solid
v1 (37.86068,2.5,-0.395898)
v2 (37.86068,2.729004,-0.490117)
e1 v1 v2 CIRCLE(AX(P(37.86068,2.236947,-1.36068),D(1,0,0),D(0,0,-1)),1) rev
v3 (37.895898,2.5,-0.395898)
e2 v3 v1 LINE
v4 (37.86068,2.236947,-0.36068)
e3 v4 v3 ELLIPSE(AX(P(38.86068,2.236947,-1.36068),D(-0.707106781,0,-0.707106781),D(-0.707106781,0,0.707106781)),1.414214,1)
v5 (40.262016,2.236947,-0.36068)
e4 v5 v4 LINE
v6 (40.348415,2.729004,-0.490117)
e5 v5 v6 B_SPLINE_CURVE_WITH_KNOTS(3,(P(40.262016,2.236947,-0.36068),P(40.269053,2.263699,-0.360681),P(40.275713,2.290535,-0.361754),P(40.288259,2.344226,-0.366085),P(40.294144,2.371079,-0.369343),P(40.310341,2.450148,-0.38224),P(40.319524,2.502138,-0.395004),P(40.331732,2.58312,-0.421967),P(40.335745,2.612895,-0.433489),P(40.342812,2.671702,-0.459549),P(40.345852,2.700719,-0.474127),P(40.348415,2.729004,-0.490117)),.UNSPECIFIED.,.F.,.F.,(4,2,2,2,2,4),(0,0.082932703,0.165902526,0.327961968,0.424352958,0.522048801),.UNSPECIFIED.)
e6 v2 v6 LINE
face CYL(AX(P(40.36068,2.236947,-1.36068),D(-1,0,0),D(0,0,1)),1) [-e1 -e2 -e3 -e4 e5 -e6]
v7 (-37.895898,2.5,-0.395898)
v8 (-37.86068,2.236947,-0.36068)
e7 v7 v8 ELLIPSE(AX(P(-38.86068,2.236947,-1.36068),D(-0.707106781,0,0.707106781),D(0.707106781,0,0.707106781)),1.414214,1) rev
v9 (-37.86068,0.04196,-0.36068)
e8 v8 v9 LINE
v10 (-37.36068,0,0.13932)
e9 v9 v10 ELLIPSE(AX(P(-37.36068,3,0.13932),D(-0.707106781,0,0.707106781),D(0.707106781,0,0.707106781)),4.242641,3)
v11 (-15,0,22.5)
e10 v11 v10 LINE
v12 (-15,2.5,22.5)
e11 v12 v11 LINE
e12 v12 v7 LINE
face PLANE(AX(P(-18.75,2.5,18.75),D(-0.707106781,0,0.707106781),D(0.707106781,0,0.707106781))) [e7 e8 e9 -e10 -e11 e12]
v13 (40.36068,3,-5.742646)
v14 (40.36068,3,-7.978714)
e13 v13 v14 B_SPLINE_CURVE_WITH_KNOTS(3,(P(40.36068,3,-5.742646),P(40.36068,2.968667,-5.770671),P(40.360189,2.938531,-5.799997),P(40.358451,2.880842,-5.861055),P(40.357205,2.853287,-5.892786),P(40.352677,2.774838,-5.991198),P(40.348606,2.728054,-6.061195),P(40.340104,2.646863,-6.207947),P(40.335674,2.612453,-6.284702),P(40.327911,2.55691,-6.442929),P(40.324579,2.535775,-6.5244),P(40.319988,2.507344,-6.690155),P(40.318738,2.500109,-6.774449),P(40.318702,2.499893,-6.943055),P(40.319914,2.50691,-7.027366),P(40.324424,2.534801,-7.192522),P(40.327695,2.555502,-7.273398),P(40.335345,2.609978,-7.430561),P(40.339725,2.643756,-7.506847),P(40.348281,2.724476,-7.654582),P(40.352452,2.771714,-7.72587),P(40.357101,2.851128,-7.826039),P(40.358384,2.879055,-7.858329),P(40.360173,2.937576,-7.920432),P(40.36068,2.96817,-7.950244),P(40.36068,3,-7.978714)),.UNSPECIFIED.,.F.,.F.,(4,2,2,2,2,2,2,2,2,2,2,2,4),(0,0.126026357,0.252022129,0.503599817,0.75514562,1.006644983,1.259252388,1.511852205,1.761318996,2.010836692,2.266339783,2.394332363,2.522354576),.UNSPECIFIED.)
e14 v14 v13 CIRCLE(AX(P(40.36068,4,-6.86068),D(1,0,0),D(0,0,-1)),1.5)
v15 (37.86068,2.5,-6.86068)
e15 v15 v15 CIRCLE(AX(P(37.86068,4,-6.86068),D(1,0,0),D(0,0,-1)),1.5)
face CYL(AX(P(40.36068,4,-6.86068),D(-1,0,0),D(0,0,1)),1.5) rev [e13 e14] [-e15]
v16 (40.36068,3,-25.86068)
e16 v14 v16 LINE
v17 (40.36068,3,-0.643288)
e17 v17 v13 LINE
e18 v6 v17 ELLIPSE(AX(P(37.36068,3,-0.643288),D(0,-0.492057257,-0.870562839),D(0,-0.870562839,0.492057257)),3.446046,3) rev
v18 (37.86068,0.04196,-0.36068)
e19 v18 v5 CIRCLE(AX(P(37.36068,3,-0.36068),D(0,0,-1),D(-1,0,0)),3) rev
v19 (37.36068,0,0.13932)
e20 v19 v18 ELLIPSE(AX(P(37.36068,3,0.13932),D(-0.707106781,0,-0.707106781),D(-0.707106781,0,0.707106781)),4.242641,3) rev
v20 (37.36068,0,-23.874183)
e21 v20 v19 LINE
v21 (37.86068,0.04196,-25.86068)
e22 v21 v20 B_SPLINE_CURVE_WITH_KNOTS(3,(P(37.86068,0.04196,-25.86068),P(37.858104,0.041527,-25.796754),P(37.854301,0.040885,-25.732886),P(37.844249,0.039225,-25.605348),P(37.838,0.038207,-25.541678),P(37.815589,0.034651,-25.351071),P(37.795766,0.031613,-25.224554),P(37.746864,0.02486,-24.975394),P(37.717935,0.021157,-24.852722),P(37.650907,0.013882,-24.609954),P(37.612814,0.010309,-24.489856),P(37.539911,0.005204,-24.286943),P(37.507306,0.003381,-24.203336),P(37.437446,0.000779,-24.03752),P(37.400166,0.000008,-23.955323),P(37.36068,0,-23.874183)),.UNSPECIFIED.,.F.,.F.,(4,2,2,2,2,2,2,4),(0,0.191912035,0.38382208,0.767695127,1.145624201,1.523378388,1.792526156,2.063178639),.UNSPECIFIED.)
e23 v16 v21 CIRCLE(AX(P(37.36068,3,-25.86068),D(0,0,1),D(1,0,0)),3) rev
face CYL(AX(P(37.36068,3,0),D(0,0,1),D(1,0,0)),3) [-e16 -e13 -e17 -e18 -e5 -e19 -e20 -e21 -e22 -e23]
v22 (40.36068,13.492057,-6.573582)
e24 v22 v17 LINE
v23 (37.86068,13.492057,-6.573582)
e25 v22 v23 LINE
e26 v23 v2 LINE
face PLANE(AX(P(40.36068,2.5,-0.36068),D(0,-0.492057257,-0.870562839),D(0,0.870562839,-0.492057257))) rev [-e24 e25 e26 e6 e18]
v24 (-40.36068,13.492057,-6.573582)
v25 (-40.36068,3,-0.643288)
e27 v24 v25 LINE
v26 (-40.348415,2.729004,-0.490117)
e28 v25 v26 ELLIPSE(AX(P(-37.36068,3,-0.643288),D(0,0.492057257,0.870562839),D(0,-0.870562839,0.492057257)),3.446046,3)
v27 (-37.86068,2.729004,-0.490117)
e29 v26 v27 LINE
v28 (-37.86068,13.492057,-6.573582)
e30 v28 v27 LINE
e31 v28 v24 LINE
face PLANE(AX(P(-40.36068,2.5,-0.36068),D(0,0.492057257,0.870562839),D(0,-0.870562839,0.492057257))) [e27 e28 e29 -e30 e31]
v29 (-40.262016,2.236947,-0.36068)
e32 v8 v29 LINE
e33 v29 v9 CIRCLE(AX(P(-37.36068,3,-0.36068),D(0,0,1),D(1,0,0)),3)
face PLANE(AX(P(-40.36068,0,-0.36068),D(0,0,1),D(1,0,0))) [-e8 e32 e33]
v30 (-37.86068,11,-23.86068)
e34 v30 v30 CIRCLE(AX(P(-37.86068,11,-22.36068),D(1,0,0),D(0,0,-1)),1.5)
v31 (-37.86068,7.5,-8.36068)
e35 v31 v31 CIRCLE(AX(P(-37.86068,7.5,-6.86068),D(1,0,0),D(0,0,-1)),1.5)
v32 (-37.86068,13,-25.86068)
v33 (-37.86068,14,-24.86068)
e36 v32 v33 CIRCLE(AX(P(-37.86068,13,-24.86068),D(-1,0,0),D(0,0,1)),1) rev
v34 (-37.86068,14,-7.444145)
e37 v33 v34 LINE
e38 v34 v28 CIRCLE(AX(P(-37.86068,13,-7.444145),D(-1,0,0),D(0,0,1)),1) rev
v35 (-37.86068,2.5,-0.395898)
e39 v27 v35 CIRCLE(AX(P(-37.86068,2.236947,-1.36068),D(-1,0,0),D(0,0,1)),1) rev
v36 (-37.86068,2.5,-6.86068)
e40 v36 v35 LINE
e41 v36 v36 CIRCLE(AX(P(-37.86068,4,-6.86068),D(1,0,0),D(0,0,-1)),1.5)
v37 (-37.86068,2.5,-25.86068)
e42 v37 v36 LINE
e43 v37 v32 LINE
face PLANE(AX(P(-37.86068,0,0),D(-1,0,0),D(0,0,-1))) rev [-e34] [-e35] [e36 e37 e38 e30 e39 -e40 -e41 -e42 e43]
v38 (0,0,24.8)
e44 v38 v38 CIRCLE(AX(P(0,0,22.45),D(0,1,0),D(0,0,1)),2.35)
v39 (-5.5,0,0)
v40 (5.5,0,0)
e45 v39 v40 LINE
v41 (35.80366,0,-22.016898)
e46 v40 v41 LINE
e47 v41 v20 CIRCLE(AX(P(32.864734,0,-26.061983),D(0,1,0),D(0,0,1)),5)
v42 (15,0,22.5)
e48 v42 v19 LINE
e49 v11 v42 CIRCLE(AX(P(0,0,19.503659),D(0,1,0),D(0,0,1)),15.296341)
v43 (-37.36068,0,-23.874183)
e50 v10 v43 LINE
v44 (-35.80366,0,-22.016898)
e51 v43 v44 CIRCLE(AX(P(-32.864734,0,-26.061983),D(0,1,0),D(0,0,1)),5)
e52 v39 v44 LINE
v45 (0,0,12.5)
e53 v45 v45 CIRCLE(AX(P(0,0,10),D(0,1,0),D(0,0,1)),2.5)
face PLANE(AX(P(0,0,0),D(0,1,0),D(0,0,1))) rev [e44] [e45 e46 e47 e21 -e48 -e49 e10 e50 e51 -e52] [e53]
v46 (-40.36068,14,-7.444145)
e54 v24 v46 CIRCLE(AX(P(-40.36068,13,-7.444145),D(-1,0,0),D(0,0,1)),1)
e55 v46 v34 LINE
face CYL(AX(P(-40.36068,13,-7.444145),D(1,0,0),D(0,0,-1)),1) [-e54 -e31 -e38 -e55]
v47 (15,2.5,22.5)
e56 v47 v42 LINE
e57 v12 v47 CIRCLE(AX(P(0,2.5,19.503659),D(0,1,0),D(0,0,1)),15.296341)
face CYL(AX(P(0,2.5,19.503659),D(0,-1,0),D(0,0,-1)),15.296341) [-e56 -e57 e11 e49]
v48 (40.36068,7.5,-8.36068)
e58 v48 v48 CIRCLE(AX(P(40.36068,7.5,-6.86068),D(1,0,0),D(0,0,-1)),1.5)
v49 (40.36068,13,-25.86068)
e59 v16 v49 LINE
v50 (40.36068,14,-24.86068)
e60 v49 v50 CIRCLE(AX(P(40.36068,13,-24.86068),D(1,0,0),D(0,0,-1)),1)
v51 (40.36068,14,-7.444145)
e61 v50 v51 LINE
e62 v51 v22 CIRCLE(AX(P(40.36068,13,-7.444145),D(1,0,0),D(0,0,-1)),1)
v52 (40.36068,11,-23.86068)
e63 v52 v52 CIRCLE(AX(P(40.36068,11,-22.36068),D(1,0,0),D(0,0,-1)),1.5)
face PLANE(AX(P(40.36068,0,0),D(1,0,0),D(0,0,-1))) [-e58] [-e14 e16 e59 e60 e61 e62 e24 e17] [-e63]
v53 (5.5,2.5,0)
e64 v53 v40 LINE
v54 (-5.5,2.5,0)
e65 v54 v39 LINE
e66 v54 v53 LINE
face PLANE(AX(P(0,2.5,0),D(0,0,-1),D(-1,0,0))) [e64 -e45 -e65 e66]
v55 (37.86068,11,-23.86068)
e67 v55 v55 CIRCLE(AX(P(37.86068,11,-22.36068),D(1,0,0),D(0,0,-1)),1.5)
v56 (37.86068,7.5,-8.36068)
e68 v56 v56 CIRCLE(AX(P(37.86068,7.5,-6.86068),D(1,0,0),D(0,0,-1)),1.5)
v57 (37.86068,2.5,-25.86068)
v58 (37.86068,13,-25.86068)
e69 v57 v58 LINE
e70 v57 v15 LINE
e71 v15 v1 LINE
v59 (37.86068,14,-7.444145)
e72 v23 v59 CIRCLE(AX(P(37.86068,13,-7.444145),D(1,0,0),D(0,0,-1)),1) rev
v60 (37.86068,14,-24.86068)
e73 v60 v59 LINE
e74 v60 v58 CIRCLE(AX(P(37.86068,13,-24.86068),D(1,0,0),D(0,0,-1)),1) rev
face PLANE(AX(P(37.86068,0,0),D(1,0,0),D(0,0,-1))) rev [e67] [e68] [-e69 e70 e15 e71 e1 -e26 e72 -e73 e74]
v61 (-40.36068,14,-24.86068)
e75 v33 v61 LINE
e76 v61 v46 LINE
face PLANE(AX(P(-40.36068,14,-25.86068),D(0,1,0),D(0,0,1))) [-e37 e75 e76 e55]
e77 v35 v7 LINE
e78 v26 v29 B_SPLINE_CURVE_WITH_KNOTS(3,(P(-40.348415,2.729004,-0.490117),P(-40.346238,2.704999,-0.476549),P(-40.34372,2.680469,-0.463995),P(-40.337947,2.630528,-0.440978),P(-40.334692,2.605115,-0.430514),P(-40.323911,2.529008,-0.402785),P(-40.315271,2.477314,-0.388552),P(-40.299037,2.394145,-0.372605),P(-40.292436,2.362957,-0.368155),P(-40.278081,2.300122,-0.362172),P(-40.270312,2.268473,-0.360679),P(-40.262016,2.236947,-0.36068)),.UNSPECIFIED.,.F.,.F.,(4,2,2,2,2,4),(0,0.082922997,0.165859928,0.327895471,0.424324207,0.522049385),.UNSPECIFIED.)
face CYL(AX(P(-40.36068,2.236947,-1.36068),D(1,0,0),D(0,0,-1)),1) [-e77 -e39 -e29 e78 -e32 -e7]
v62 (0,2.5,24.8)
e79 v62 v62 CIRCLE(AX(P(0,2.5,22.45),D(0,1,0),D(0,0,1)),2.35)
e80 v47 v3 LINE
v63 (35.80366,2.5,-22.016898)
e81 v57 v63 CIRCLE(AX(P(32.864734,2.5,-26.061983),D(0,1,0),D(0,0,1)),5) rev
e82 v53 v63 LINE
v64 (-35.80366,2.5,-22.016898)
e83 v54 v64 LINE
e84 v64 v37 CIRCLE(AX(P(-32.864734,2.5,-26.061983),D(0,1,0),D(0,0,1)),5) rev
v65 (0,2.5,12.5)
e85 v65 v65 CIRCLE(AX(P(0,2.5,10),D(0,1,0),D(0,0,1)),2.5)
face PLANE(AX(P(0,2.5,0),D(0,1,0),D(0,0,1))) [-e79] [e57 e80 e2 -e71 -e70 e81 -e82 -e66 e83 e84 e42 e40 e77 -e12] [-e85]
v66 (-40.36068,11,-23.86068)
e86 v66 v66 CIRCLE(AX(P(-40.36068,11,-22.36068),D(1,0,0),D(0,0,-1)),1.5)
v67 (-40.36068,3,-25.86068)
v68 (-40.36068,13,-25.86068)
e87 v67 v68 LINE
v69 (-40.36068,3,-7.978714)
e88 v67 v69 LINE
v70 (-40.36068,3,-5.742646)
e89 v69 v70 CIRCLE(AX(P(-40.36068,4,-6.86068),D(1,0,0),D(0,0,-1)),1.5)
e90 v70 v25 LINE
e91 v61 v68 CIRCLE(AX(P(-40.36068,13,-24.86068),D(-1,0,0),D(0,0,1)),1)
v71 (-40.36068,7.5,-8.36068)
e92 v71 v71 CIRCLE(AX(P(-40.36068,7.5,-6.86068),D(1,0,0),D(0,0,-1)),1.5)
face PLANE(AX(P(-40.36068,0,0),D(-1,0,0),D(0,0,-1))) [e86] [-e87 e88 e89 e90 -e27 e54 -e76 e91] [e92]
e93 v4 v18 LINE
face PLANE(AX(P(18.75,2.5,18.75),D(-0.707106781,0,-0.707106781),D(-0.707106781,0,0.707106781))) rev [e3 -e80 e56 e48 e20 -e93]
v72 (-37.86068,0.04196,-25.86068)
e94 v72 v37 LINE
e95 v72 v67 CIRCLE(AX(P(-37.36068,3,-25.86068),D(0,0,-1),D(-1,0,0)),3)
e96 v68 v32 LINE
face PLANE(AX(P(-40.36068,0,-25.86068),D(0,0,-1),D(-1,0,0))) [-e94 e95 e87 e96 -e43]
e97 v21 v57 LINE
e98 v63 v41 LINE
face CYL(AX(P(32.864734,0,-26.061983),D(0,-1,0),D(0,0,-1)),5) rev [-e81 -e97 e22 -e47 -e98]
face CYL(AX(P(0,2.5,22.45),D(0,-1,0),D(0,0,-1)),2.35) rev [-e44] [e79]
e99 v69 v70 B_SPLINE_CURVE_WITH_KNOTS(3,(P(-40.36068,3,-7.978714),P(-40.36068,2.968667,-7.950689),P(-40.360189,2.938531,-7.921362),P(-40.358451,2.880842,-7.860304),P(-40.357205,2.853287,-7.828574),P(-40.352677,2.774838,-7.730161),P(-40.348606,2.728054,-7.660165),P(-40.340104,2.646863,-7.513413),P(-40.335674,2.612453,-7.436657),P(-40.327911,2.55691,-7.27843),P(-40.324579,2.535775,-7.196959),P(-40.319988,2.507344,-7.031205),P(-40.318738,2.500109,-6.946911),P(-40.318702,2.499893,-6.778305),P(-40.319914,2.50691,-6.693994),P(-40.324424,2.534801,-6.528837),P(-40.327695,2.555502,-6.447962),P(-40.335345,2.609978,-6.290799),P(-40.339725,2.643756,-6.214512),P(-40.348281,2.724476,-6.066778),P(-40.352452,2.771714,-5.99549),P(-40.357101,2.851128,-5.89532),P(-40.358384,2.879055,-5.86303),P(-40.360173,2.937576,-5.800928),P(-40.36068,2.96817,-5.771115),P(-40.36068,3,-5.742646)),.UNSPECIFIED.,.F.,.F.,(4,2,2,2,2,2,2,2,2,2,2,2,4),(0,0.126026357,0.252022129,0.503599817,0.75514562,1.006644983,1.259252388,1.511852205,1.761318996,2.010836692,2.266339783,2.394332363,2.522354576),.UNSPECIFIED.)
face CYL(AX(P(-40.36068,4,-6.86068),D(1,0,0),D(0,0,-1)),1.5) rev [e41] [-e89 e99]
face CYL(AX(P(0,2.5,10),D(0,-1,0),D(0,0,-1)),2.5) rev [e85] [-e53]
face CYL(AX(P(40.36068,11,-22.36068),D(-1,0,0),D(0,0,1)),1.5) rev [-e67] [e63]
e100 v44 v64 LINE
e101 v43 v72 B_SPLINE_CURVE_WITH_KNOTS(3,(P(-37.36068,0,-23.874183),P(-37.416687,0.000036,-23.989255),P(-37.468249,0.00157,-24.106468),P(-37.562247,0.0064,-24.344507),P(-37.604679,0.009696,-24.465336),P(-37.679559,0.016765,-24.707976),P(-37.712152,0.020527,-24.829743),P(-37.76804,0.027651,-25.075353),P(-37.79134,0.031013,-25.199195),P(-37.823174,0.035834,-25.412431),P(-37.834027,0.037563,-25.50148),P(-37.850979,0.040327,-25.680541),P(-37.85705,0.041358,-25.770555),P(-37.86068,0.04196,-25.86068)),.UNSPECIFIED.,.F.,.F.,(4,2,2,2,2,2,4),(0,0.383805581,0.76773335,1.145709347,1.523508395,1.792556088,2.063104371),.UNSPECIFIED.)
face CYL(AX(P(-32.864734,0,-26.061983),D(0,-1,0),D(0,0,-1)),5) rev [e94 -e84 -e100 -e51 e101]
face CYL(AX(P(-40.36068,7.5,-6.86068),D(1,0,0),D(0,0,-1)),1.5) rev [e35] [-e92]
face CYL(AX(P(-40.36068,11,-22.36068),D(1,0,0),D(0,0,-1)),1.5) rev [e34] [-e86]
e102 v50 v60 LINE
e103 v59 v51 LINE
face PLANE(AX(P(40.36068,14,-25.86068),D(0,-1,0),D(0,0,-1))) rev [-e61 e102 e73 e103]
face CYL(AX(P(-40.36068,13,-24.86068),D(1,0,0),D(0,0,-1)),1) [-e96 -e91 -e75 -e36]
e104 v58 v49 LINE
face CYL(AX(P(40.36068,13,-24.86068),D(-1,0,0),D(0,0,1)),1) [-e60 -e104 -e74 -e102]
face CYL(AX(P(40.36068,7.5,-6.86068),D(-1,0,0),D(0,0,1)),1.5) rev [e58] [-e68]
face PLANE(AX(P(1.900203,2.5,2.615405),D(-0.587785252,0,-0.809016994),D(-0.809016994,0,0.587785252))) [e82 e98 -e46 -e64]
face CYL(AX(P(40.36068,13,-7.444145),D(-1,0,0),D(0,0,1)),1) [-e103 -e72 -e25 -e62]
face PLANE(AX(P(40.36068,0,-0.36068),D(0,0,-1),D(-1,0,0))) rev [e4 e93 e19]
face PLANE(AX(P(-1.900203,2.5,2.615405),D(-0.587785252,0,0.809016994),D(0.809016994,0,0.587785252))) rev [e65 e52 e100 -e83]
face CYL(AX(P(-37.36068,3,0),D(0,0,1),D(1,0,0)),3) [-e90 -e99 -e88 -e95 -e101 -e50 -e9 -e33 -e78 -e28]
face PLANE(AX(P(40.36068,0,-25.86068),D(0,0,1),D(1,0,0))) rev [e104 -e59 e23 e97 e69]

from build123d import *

# Parameters (mm, degrees)
SKETCH1_R           = 2.35
SKETCH1_R_2         = 2.5
BOSS_EXTRUDE1_DEPTH = 2.5
SKETCH2_R           = 1.5
BOSS_EXTRUDE2_DEPTH = 2.5
FILLET1_R           = 5
FILLET2_R           = 1
FILLET3_R           = 3


with BuildPart() as part:
    # Sketch1 → Boss-Extrude1 (new body)
    with BuildSketch(Plane(origin=(0, 0, 0), x_dir=(1, 0, 0), z_dir=(0, 1, 0))):
        with BuildLine():
            Line((-5.5, 0), (5.5, 0))
            Line((5.5, 0), (37.860679775, 23.511410092))
            Line((37.860679775, 23.511410092), (37.860679775, 0.360679775))
            Line((37.860679775, 0.360679775), (15, -22.5))
            ThreePointArc((15, -22.5), (0, -34.8), (-15, -22.5))
            Line((-15, -22.5), (-37.860679775, 0.360679775))
            Line((-37.860679775, 0.360679775), (-37.860679775, 23.511410092))
            Line((-37.860679775, 23.511410092), (-5.5, 0))
        make_face()
        with Locations(Location((0, -22.45, 0), (0, 0, 270))):
            Circle(SKETCH1_R, mode=Mode.SUBTRACT)
        with Locations(Location((0, -10, 0), (0, 0, 270))):
            Circle(SKETCH1_R_2, mode=Mode.SUBTRACT)
    extrude(amount=BOSS_EXTRUDE1_DEPTH)

    # Sketch2 → Boss-Extrude2 (add)
    with BuildSketch(Plane(origin=(37.860679775, 0, 0), x_dir=(0, 0, -1), z_dir=(1, 0, 0))):
        Polygon((0.360679775, 0), (25.860679775, 0), (25.860679775, 14), (6.860679775, 14), (0.360679775, 2.5), align=None)
        with Locations((6.860679775, 7.5)):
            Circle(SKETCH2_R, mode=Mode.SUBTRACT)
        with Locations((22.360679775, 11)):
            Circle(SKETCH2_R, mode=Mode.SUBTRACT)
        with Locations(Location((6.860679775, 4, 0), (0, 0, 270))):
            Circle(SKETCH2_R, mode=Mode.SUBTRACT)
    boss_extrude2 = extrude(amount=BOSS_EXTRUDE2_DEPTH)

    # Mirror1: Boss-Extrude2 across plane
    add(boss_extrude2.mirror(Plane(origin=(0, 0, 0), x_dir=(0, 0, 1), z_dir=(1, 0, 0))))

    # Fillet1
    # the kernel refuses this fillet: 5 mm, written as the material it adds along each edge
    with BuildSketch(Plane(origin=(37.860679775, 0, -23.511410092), x_dir=(-0.8090169943749437, 0, 0.5877852522924782), z_dir=(0, 1, 0))) as fillet1_piece_1:
        with BuildLine():
            CenterArc((2.542616315, -5), FILLET1_R, 90, 51.692614863)
            Line((-1.380866074, -1.900599098), (-1.459335721, -1.83861108))
            ThreePointArc((-1.459335721, -1.83861108), (-0.771334736, -0.891521024), (-0.080901699, 0.058778525))
            Line((-0.080901699, 0.058778525), (0, 0.1))
            Line((0, 0.1), (2.542616315, 0.1))
            Line((2.542616315, 0.1), (2.542616315, 0))
        make_face()
    extrude(amount=2.5)
    with BuildSketch(Plane(origin=(-37.860679775, 0, -23.511410092), x_dir=(0.8090169943749425, 0, 0.58778525229248), z_dir=(0, 1, 0))) as fillet1_piece_2:
        with BuildLine():
            CenterArc((2.542616315, 5), FILLET1_R, 218.307385137, 51.692614863)
            Line((-1.380866074, 1.900599098), (-1.459335721, 1.83861108))
            ThreePointArc((-1.459335721, 1.83861108), (-0.771334736, 0.891521024), (-0.080901699, -0.058778525))
            Line((-0.080901699, -0.058778525), (0, -0.1))
            Line((0, -0.1), (2.542616315, -0.1))
            Line((2.542616315, -0.1), (2.542616315, 0))
        make_face()
    extrude(amount=2.5)

    # Fillet2
    fillet2_edges = [part.edges().sort_by_distance(p)[0] for p in [
        (39.110679775, 2.5, -0.360679775),
        (39.110679775, 14, -25.860679775),
        (39.110679775, 14, -6.860679775),
        (-39.110679775, 2.5, -0.360679775),
        (-39.110679775, 14, -6.860679775),
        (-39.110679775, 14, -25.860679775),
    ]]
    fillet(fillet2_edges, radius=FILLET2_R)

    # Fillet3
    # the kernel refuses this fillet: 3 mm, written as the material it takes off along each edge
    with BuildSketch(Plane(origin=(-40.360679775, 0, 7.139320225), x_dir=(1, 0, 0), z_dir=(0, 0, -1)), Plane(origin=(40.360679775, 0, 7.139320225), x_dir=(0, 1, 0), z_dir=(0, 0, -1))) as fillet3_piece_1:
        with BuildLine():
            CenterArc((FILLET3_R, -FILLET3_R), FILLET3_R, 90, 90)
            Line((0, -FILLET3_R), (0, 0))
            Line((0, 0), (FILLET3_R, 0))
        make_face()
    extrude(amount=40.5, mode=Mode.SUBTRACT)


solid = part.part
